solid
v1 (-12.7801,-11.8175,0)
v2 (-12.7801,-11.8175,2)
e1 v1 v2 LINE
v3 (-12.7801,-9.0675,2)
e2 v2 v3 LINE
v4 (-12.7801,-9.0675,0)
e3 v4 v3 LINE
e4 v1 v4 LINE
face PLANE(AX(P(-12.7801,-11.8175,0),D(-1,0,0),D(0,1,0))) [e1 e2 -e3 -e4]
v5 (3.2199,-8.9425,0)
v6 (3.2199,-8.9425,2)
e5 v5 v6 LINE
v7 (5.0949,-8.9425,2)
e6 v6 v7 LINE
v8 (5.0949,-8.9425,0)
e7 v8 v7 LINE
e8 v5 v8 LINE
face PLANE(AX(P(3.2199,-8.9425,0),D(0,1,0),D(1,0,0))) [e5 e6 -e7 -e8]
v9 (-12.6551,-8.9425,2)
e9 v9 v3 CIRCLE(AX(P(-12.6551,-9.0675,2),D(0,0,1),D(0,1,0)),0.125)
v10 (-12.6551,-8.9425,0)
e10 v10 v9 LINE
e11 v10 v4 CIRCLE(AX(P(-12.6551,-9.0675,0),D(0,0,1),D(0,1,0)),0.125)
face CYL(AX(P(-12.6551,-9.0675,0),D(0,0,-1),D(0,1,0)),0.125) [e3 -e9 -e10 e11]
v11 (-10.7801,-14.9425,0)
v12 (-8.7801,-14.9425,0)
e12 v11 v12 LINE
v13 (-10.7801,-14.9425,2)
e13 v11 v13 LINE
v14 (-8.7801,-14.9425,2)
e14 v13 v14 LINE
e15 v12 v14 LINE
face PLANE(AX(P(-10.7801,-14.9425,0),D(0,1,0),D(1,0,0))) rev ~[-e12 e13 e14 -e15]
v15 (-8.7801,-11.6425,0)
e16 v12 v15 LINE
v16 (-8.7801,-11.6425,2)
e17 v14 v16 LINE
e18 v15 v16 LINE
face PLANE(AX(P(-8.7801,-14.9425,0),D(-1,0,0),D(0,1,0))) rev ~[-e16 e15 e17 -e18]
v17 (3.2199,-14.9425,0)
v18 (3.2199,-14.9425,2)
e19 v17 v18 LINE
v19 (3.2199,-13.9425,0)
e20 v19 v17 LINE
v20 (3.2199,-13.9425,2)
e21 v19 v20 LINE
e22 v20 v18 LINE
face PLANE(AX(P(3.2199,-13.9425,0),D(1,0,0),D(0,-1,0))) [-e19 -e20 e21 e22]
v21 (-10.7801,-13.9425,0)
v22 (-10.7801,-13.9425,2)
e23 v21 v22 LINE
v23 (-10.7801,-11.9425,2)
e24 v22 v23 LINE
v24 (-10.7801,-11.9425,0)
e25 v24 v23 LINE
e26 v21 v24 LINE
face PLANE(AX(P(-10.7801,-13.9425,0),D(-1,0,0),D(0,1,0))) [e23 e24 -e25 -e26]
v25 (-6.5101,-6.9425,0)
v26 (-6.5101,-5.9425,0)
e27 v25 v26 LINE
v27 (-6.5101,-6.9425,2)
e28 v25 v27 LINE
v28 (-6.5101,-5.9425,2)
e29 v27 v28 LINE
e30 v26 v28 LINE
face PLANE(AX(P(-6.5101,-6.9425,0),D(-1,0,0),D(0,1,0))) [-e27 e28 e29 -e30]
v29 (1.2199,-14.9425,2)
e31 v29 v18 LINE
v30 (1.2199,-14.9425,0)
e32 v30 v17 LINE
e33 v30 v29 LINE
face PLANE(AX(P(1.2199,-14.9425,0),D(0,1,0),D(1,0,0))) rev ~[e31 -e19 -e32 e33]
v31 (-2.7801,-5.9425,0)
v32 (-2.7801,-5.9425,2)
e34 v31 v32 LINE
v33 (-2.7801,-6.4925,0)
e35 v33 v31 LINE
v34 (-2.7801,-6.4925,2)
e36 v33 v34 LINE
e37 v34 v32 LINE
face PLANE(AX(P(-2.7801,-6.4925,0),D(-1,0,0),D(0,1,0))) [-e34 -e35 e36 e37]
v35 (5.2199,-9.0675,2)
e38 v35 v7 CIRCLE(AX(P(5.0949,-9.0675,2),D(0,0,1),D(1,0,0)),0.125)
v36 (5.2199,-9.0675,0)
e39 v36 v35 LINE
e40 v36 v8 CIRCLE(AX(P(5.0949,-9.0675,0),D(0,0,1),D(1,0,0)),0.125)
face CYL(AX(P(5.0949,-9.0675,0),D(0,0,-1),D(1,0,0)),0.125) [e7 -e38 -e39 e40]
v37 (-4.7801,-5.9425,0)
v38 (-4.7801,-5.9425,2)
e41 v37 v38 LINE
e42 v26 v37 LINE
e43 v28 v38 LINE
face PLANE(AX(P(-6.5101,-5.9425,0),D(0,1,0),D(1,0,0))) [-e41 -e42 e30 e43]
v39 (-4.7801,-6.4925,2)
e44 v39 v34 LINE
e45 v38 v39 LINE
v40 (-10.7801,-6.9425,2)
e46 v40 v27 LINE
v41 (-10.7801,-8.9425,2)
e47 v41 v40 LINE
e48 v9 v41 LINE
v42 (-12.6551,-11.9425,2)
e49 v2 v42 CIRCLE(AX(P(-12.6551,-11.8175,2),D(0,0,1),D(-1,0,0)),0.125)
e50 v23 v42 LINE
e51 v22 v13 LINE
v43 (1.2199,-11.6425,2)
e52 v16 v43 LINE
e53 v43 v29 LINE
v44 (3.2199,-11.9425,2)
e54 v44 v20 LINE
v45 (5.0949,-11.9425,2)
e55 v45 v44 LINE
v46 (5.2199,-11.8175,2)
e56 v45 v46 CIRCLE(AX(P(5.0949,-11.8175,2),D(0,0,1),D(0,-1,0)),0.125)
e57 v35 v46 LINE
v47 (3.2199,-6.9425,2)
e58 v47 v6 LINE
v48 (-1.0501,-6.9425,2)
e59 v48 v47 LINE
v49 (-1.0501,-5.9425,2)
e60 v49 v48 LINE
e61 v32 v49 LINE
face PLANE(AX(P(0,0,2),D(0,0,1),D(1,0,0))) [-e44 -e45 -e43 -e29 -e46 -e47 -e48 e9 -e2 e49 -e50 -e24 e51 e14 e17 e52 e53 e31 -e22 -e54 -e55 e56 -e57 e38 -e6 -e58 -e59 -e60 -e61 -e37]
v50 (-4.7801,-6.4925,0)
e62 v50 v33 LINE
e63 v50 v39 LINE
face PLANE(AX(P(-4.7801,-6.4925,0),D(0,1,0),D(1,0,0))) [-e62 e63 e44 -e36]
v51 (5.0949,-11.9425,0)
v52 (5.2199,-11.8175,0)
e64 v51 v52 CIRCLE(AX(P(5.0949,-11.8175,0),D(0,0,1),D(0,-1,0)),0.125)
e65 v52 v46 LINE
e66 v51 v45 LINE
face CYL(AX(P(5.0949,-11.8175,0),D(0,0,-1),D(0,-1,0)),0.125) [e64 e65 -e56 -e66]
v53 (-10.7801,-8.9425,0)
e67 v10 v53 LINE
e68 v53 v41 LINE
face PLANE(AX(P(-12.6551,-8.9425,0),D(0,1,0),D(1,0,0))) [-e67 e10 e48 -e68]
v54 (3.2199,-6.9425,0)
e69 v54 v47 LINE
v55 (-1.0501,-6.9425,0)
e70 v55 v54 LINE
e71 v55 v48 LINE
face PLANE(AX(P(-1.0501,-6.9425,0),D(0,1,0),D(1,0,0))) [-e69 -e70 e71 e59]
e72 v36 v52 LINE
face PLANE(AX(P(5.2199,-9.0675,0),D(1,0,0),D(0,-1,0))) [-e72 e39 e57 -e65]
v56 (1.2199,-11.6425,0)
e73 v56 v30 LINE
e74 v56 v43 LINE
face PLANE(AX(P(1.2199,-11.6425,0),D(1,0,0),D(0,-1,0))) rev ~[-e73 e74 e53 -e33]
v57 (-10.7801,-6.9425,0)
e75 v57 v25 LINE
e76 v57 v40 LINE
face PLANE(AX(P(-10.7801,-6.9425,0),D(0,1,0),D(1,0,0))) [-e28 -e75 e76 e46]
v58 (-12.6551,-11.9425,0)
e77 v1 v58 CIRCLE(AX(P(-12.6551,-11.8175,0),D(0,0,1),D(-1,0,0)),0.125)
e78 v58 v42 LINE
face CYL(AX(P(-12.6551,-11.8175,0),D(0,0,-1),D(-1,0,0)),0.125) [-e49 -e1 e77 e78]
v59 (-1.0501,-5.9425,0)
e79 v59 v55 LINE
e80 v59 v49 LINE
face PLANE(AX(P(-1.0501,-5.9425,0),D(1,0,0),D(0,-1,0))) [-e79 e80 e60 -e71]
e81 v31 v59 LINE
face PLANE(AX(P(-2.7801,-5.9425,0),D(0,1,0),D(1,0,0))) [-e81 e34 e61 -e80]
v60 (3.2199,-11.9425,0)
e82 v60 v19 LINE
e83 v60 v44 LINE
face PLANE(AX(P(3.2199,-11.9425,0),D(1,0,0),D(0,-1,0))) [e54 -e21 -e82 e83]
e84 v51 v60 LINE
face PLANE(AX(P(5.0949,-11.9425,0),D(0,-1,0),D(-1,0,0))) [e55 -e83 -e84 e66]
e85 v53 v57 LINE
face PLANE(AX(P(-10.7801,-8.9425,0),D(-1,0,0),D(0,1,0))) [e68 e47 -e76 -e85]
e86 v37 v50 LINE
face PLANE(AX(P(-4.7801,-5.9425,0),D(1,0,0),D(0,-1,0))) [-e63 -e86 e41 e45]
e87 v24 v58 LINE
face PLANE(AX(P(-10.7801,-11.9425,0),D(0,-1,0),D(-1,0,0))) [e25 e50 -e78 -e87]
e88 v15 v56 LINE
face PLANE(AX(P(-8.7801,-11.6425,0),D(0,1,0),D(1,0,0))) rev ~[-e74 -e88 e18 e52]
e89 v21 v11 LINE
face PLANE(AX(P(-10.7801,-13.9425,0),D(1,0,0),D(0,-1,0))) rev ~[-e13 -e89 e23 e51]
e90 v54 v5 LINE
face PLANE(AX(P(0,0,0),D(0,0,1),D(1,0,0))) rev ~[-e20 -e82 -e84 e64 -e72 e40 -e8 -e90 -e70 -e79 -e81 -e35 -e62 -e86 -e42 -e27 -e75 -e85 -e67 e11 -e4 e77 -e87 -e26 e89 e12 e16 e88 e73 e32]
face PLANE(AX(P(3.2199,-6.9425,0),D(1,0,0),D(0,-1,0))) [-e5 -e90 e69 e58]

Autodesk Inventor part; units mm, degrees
ref_plane "YZ Plane" through (0, 0, 0) normal (1, 0, 0) x (0, 1, 0)
ref_plane "XZ Plane" through (0, 0, 0) normal (0, 1, 0) x (-1, 0, 0)
ref_plane "XY Plane" through (0, 0, 0) normal (0, 0, 1) x (1, 0, 0)
sketch "Unit" plane through (0, 0, 0) normal (0, 0, 1) x (1, 0, 0)
  line L0 (17.4453, 22.2497) -> (21.7153, 22.2497)
  line L1 (21.7153, 22.2497) -> (21.7153, 23.2497)
  line L2 (21.7153, 23.2497) -> (23.4453, 23.2497)
  line L3 (21.7153, 23.2497) -> (21.7153, 24.9797) construction
  line L4 (23.4453, 23.2497) -> (23.4453, 22.6997)
  line L5 (23.4453, 22.6997) -> (25.4453, 22.6997)
  line L6 (25.4453, 22.6997) -> (25.4453, 23.2497)
  line L7 (25.4453, 23.2497) -> (27.1753, 23.2497)
  line L8 (27.1753, 23.2497) -> (27.1753, 22.2497)
  line L9 (27.1753, 22.2497) -> (31.4453, 22.2497)
  line L10 (26.3953, 20.7497) -> (22.4953, 20.7497) construction
  line L11 (22.4953, 20.7497) -> (22.4953, 18.7497) construction
  line L12 (22.4953, 18.7497) -> (26.3953, 18.7497) construction
  line L13 (26.3953, 18.7497) -> (26.3953, 20.7497) construction
  line L14 (26.3953, 20.7497) -> (22.4953, 18.7497) construction
  line L15 (22.4953, 20.7497) -> (26.3953, 18.7497) construction
  point P0 (20.0288, 26.7181)
  point P1 (24.4453, 19.7497)
  dimension "d17" = 2
  dimension "d31" = 110
  dimension "d32" = 0
  dimension "d33" = 2
  dimension "d34" = 20
  dimension "d35" = 20
  dimension "d36" = 1.5
  dimension "d37" = 20.3526
  dimension "d2" = 1
  dimension "d3" = 1.73
  dimension "d4" = 0.55
  dimension "d5" = 2
  dimension "d6" = 1.73
  dimension "d7" = 1
  dimension "d12" = 3.9
  dimension "d13" = 2
  dimension "d14" = 1.5
  dimension "d40" = 14
  dimension "d102" = 4.27
sketch "Anchor" plane through (0, 0, 0) normal (0, 0, 1) x (1, 0, 0)
  line L0 (2, 0) -> (2, 1.875)
  line L1 (2, 0) -> (3, 0) construction
  line L2 (2.125, 2) -> (4.875, 2)
  line L3 (5, 1.875) -> (5, 0)
  line L4 (5, 2) -> (7, 2) construction
  line L5 (0, 0) -> (2, 0)
  line L6 (5, 0) -> (7, 0)
  arc A0 (2.125, 2) -> (2, 1.875) centre (2.125, 1.875) ccw
  arc A1 (5, 1.875) -> (4.875, 2) centre (4.875, 1.875) ccw
  point P0 (9.1321, -0.6227)
  point P1 (2, 2)
  dimension "d69" = 15
  dimension "d45" = 2
  dimension "d46" = 2
  dimension "d47" = 3
  dimension "d48" = 2
  dimension "d60" = 2
  dimension "d67" = 0.125
sketch "Esquisse2" plane through (0, 0, 0) normal (0, 0, 1) x (1, 0, 0)
  line L0 (-10.7801, -14.9425) -> (-8.7801, -14.9425)
  line L1 (-10.7801, -13.9425) -> (-10.7801, -14.9425)
  line L2 (3.2199, -13.9425) -> (3.2199, -14.9425)
  line L3 (-8.7801, -14.9425) -> (-8.7801, -11.6425)
  line L4 (1.2199, -11.6425) -> (1.2199, -14.9425)
  line L5 (1.2199, -14.9425) -> (3.2199, -14.9425)
  line L6 (-8.7801, -11.6425) -> (1.2199, -11.6425)
  line L7 (-10.7801, -11.9425) -> (-12.6551, -11.9425)
  line L8 (-10.7801, -11.9425) -> (-10.7801, -10.9425) construction
  line L9 (-12.7801, -11.8175) -> (-12.7801, -9.0675)
  line L10 (-12.6551, -8.9425) -> (-10.7801, -8.9425)
  line L11 (-12.7801, -8.9425) -> (-12.7801, -6.9425) construction
  line L12 (-10.7801, -13.9425) -> (-10.7801, -11.9425)
  line L13 (-10.7801, -8.9425) -> (-10.7801, -6.9425)
  arc A0 (-12.7801, -11.8175) -> (-12.6551, -11.9425) centre (-12.6551, -11.8175) ccw
  arc A1 (-12.6551, -8.9425) -> (-12.7801, -9.0675) centre (-12.6551, -9.0675) ccw
  line L14 (3.2199, -8.9425) -> (5.0949, -8.9425)
  line L15 (3.2199, -8.9425) -> (3.2199, -9.9425) construction
  line L16 (5.2199, -9.0675) -> (5.2199, -11.8175)
  line L17 (5.0949, -11.9425) -> (3.2199, -11.9425)
  line L18 (5.2199, -11.9425) -> (5.2199, -13.9425) construction
  line L19 (3.2199, -6.9425) -> (3.2199, -8.9425)
  line L20 (3.2199, -11.9425) -> (3.2199, -13.9425)
  arc A2 (5.2199, -9.0675) -> (5.0949, -8.9425) centre (5.0949, -9.0675) ccw
  arc A3 (5.0949, -11.9425) -> (5.2199, -11.8175) centre (5.0949, -11.8175) ccw
  line L21 (-10.7801, -6.9425) -> (-6.5101, -6.9425)
  line L22 (-6.5101, -6.9425) -> (-6.5101, -5.9425)
  line L23 (-6.5101, -5.9425) -> (-4.7801, -5.9425)
  line L24 (-6.5101, -5.9425) -> (-6.5101, -4.2125) construction
  line L25 (-4.7801, -5.9425) -> (-4.7801, -6.4925)
  line L26 (-4.7801, -6.4925) -> (-2.7801, -6.4925)
  line L27 (-2.7801, -6.4925) -> (-2.7801, -5.9425)
  line L28 (-2.7801, -5.9425) -> (-1.0501, -5.9425)
  line L29 (-1.0501, -5.9425) -> (-1.0501, -6.9425)
  line L30 (-1.0501, -6.9425) -> (3.2199, -6.9425)
  line L31 (-1.8301, -8.4425) -> (-5.7301, -8.4425) construction
  line L32 (-5.7301, -8.4425) -> (-5.7301, -10.4425) construction
  line L33 (-5.7301, -10.4425) -> (-1.8301, -10.4425) construction
  line L34 (-1.8301, -10.4425) -> (-1.8301, -8.4425) construction
  line L35 (-1.8301, -8.4425) -> (-5.7301, -10.4425) construction
  line L36 (-5.7301, -8.4425) -> (-1.8301, -10.4425) construction
  point P0 (0, 0)
  point P1 (3.2199, -6.9425)
  point P2 (-10.7801, -6.9425)
  point P3 (-10.7803, -12.8535)
  point P4 (3.2197, -12.8535)
  dimension "d101" = 14
  dimension "d97" = 4.7
  dimension "d98" = 8
  dimension "d99" = 2
  dimension "d100" = 10
extrude "Extrusion1" add sketch "Esquisse2" along normal blind 2
equation "\"d35\" = d34"
equation "\"d6\" = d3"
equation "\"d7\" = d2"
equation "\"d13\" = sheet_thickness"
equation "\"d45\" = safe_distance"
equation "\"d46\" = sheet_thickness"
equation "\"d47\" = 1.5 * sheet_thickness"
equation "\"d48\" = sheet_thickness"
equation "\"d99\" = safe_distance"
equation "\"d71\" = sheet_thickness"
equation "\"d60\" = safe_distance"
equation "\"sheet_thickness\" = 2"
equation "\"safe_distance\" = 2"
properties part number "extra_switch_support" material "Acier inoxydable"
